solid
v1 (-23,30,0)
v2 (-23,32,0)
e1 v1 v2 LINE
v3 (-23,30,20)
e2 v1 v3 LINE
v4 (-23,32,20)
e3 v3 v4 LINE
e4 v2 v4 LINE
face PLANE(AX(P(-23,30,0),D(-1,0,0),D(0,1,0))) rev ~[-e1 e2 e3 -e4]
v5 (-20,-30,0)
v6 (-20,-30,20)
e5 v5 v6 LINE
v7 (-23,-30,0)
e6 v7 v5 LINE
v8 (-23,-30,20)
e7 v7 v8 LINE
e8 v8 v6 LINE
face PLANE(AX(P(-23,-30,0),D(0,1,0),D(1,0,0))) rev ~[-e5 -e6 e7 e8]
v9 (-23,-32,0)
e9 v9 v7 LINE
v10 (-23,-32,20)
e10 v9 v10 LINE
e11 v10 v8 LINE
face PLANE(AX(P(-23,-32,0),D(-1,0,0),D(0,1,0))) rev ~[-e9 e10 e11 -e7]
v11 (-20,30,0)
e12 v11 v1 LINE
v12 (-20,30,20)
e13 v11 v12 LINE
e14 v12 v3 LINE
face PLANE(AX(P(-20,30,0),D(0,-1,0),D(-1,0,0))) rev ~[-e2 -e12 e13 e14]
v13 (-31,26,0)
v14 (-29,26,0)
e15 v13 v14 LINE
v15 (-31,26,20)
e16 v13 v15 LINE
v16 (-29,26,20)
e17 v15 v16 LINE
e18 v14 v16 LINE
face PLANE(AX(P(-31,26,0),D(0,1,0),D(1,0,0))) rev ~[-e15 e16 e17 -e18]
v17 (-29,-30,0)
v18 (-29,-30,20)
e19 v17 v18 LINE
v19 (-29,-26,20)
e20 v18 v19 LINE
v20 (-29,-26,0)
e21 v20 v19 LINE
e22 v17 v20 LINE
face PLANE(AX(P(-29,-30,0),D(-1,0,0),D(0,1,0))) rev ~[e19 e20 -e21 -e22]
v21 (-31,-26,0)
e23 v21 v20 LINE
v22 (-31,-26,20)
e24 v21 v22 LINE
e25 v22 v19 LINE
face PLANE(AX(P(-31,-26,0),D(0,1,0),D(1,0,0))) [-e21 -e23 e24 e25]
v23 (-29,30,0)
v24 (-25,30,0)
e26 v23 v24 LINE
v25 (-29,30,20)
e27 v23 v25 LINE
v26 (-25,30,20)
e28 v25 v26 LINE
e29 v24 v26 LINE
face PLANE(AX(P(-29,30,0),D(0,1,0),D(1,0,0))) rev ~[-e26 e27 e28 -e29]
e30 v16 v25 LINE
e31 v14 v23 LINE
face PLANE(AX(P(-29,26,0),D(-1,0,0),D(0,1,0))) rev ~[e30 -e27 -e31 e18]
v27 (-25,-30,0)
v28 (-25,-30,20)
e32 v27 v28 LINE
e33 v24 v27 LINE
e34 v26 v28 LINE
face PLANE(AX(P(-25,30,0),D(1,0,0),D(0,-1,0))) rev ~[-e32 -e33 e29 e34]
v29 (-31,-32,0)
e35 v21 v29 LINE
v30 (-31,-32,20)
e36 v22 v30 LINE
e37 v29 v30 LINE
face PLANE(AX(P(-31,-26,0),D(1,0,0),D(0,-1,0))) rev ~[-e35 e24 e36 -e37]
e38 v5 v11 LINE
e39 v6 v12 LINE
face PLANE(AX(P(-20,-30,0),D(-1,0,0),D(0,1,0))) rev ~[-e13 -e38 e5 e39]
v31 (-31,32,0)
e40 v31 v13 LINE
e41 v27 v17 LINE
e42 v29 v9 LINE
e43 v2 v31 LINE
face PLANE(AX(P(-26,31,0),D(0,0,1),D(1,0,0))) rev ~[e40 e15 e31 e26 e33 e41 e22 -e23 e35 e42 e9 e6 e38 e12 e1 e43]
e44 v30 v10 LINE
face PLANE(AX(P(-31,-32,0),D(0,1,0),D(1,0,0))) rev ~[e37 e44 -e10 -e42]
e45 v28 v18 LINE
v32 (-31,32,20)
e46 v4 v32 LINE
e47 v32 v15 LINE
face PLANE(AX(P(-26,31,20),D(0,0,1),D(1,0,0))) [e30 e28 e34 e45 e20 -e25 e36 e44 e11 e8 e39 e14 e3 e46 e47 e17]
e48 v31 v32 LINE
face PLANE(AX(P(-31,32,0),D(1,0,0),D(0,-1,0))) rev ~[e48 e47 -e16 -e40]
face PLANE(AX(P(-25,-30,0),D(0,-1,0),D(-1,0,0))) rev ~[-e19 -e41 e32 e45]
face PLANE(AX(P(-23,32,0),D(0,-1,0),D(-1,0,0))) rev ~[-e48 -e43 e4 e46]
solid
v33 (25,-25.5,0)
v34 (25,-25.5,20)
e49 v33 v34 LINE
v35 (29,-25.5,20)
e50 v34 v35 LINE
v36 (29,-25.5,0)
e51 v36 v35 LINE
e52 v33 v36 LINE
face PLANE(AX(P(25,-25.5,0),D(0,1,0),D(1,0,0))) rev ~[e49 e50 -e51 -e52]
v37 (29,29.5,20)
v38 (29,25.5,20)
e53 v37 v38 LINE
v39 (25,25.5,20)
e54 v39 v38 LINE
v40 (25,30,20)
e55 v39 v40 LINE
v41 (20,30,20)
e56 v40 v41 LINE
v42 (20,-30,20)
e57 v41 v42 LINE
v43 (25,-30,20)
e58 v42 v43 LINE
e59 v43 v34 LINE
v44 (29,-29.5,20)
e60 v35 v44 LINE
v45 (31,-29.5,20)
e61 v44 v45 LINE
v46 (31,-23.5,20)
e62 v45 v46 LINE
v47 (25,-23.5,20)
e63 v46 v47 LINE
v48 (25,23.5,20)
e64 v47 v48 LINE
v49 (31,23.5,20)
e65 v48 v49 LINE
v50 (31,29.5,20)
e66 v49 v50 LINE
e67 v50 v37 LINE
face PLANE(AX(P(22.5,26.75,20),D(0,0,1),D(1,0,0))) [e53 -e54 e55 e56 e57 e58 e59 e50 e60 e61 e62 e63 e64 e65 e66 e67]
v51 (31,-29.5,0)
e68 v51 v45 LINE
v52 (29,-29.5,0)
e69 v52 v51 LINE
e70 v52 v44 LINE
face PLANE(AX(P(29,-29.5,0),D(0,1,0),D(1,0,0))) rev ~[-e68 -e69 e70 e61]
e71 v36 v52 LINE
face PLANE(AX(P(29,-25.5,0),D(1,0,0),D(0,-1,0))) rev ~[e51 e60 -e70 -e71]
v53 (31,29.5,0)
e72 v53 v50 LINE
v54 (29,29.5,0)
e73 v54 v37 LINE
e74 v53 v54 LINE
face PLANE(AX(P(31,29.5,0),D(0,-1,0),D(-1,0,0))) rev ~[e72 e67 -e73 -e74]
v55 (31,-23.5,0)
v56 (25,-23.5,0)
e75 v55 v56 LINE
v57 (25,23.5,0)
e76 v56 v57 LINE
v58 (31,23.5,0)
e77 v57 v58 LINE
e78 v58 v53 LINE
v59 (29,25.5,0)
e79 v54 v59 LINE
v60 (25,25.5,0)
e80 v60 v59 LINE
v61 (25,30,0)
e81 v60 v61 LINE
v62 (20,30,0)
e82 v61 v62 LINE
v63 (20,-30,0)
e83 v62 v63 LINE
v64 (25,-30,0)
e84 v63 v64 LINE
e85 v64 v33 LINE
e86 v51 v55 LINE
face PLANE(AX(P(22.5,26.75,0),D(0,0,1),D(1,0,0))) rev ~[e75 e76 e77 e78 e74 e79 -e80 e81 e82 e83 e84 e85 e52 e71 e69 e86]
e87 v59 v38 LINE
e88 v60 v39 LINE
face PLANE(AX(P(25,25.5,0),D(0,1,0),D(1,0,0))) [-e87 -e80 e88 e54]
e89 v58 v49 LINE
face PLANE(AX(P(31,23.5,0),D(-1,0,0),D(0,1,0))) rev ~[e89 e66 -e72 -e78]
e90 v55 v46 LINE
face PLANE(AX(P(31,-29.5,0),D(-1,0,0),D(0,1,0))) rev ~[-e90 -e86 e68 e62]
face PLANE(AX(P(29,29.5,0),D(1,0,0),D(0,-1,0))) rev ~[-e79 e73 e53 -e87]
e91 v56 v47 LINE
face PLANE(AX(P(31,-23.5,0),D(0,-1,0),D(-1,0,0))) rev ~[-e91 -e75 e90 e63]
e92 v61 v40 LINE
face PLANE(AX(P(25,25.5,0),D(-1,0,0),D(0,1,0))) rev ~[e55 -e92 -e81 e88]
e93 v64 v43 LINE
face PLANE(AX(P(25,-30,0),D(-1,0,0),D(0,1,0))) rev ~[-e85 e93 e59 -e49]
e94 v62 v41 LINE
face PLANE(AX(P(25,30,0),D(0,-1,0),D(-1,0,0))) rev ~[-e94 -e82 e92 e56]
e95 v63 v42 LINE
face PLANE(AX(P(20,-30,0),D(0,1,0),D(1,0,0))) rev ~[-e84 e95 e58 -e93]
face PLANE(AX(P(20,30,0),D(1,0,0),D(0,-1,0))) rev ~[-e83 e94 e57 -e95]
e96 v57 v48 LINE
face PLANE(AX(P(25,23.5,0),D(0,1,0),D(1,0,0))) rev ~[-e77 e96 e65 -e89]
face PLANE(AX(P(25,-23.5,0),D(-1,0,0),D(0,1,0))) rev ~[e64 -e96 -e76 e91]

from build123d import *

# Parameters (mm, degrees)
F0_W     = 5
F0_H     = 47
F0_W_2   = 2
F0_H_2   = 4
F0_H_3   = 2
F1_DEPTH = 20
F0_W_3   = 4


with BuildPart() as f1:
    # F0 (on Top) → F1 (new body)
    with BuildSketch(Plane.XY):
        Polygon((-29, 30), (-25, 30), (-23, 30), (-23, 32), (-29, 32), align=None)
        Polygon((-23, 30), (-25, 30), (-25, 23.5), (-20, 23.5), (-20, 30), align=None)
        with Locations((-22.5, 0)):
            Rectangle(F0_W, F0_H)
        with Locations((-30, 28)):
            Rectangle(F0_W_2, F0_H_2)
        with Locations((-30, 31)):
            Rectangle(F0_W_2, F0_H_3)
        Polygon((-20, -23.5), (-25, -23.5), (-25, -30), (-23, -30), (-20, -30), align=None)
        Polygon((-23, -30), (-25, -30), (-29, -30), (-29, -32), (-23, -32), align=None)
        with Locations((-30, -31)):
            Rectangle(F0_W_2, F0_H_3)
        with Locations((-30, -28)):
            Rectangle(F0_W_2, F0_H_2)
    extrude(amount=F1_DEPTH)


with BuildPart() as f1b:
    # F0 (on Top) → F1, piece 2 (new body)
    with BuildSketch(Plane.XY):
        Polygon((25, 30), (20, 30), (20, 23.5), (25, 23.5), (25, 25.5), align=None)
        with Locations((22.5, 0)):
            Rectangle(F0_W, F0_H)
        Polygon((25, -23.5), (20, -23.5), (20, -30), (25, -30), (25, -25.5), align=None)
        with Locations((27, 24.5)):
            Rectangle(F0_W_3, F0_H_3)
        with Locations((27, -24.5)):
            Rectangle(F0_W_3, F0_H_3)
        Polygon((29, 25.5), (29, 23.5), (31, 23.5), (31, 29.5), (29, 29.5), align=None)
        Polygon((31, -23.5), (29, -23.5), (29, -25.5), (29, -29.5), (31, -29.5), align=None)
    extrude(amount=F1_DEPTH)


solid = Compound([f1.part, f1b.part])
